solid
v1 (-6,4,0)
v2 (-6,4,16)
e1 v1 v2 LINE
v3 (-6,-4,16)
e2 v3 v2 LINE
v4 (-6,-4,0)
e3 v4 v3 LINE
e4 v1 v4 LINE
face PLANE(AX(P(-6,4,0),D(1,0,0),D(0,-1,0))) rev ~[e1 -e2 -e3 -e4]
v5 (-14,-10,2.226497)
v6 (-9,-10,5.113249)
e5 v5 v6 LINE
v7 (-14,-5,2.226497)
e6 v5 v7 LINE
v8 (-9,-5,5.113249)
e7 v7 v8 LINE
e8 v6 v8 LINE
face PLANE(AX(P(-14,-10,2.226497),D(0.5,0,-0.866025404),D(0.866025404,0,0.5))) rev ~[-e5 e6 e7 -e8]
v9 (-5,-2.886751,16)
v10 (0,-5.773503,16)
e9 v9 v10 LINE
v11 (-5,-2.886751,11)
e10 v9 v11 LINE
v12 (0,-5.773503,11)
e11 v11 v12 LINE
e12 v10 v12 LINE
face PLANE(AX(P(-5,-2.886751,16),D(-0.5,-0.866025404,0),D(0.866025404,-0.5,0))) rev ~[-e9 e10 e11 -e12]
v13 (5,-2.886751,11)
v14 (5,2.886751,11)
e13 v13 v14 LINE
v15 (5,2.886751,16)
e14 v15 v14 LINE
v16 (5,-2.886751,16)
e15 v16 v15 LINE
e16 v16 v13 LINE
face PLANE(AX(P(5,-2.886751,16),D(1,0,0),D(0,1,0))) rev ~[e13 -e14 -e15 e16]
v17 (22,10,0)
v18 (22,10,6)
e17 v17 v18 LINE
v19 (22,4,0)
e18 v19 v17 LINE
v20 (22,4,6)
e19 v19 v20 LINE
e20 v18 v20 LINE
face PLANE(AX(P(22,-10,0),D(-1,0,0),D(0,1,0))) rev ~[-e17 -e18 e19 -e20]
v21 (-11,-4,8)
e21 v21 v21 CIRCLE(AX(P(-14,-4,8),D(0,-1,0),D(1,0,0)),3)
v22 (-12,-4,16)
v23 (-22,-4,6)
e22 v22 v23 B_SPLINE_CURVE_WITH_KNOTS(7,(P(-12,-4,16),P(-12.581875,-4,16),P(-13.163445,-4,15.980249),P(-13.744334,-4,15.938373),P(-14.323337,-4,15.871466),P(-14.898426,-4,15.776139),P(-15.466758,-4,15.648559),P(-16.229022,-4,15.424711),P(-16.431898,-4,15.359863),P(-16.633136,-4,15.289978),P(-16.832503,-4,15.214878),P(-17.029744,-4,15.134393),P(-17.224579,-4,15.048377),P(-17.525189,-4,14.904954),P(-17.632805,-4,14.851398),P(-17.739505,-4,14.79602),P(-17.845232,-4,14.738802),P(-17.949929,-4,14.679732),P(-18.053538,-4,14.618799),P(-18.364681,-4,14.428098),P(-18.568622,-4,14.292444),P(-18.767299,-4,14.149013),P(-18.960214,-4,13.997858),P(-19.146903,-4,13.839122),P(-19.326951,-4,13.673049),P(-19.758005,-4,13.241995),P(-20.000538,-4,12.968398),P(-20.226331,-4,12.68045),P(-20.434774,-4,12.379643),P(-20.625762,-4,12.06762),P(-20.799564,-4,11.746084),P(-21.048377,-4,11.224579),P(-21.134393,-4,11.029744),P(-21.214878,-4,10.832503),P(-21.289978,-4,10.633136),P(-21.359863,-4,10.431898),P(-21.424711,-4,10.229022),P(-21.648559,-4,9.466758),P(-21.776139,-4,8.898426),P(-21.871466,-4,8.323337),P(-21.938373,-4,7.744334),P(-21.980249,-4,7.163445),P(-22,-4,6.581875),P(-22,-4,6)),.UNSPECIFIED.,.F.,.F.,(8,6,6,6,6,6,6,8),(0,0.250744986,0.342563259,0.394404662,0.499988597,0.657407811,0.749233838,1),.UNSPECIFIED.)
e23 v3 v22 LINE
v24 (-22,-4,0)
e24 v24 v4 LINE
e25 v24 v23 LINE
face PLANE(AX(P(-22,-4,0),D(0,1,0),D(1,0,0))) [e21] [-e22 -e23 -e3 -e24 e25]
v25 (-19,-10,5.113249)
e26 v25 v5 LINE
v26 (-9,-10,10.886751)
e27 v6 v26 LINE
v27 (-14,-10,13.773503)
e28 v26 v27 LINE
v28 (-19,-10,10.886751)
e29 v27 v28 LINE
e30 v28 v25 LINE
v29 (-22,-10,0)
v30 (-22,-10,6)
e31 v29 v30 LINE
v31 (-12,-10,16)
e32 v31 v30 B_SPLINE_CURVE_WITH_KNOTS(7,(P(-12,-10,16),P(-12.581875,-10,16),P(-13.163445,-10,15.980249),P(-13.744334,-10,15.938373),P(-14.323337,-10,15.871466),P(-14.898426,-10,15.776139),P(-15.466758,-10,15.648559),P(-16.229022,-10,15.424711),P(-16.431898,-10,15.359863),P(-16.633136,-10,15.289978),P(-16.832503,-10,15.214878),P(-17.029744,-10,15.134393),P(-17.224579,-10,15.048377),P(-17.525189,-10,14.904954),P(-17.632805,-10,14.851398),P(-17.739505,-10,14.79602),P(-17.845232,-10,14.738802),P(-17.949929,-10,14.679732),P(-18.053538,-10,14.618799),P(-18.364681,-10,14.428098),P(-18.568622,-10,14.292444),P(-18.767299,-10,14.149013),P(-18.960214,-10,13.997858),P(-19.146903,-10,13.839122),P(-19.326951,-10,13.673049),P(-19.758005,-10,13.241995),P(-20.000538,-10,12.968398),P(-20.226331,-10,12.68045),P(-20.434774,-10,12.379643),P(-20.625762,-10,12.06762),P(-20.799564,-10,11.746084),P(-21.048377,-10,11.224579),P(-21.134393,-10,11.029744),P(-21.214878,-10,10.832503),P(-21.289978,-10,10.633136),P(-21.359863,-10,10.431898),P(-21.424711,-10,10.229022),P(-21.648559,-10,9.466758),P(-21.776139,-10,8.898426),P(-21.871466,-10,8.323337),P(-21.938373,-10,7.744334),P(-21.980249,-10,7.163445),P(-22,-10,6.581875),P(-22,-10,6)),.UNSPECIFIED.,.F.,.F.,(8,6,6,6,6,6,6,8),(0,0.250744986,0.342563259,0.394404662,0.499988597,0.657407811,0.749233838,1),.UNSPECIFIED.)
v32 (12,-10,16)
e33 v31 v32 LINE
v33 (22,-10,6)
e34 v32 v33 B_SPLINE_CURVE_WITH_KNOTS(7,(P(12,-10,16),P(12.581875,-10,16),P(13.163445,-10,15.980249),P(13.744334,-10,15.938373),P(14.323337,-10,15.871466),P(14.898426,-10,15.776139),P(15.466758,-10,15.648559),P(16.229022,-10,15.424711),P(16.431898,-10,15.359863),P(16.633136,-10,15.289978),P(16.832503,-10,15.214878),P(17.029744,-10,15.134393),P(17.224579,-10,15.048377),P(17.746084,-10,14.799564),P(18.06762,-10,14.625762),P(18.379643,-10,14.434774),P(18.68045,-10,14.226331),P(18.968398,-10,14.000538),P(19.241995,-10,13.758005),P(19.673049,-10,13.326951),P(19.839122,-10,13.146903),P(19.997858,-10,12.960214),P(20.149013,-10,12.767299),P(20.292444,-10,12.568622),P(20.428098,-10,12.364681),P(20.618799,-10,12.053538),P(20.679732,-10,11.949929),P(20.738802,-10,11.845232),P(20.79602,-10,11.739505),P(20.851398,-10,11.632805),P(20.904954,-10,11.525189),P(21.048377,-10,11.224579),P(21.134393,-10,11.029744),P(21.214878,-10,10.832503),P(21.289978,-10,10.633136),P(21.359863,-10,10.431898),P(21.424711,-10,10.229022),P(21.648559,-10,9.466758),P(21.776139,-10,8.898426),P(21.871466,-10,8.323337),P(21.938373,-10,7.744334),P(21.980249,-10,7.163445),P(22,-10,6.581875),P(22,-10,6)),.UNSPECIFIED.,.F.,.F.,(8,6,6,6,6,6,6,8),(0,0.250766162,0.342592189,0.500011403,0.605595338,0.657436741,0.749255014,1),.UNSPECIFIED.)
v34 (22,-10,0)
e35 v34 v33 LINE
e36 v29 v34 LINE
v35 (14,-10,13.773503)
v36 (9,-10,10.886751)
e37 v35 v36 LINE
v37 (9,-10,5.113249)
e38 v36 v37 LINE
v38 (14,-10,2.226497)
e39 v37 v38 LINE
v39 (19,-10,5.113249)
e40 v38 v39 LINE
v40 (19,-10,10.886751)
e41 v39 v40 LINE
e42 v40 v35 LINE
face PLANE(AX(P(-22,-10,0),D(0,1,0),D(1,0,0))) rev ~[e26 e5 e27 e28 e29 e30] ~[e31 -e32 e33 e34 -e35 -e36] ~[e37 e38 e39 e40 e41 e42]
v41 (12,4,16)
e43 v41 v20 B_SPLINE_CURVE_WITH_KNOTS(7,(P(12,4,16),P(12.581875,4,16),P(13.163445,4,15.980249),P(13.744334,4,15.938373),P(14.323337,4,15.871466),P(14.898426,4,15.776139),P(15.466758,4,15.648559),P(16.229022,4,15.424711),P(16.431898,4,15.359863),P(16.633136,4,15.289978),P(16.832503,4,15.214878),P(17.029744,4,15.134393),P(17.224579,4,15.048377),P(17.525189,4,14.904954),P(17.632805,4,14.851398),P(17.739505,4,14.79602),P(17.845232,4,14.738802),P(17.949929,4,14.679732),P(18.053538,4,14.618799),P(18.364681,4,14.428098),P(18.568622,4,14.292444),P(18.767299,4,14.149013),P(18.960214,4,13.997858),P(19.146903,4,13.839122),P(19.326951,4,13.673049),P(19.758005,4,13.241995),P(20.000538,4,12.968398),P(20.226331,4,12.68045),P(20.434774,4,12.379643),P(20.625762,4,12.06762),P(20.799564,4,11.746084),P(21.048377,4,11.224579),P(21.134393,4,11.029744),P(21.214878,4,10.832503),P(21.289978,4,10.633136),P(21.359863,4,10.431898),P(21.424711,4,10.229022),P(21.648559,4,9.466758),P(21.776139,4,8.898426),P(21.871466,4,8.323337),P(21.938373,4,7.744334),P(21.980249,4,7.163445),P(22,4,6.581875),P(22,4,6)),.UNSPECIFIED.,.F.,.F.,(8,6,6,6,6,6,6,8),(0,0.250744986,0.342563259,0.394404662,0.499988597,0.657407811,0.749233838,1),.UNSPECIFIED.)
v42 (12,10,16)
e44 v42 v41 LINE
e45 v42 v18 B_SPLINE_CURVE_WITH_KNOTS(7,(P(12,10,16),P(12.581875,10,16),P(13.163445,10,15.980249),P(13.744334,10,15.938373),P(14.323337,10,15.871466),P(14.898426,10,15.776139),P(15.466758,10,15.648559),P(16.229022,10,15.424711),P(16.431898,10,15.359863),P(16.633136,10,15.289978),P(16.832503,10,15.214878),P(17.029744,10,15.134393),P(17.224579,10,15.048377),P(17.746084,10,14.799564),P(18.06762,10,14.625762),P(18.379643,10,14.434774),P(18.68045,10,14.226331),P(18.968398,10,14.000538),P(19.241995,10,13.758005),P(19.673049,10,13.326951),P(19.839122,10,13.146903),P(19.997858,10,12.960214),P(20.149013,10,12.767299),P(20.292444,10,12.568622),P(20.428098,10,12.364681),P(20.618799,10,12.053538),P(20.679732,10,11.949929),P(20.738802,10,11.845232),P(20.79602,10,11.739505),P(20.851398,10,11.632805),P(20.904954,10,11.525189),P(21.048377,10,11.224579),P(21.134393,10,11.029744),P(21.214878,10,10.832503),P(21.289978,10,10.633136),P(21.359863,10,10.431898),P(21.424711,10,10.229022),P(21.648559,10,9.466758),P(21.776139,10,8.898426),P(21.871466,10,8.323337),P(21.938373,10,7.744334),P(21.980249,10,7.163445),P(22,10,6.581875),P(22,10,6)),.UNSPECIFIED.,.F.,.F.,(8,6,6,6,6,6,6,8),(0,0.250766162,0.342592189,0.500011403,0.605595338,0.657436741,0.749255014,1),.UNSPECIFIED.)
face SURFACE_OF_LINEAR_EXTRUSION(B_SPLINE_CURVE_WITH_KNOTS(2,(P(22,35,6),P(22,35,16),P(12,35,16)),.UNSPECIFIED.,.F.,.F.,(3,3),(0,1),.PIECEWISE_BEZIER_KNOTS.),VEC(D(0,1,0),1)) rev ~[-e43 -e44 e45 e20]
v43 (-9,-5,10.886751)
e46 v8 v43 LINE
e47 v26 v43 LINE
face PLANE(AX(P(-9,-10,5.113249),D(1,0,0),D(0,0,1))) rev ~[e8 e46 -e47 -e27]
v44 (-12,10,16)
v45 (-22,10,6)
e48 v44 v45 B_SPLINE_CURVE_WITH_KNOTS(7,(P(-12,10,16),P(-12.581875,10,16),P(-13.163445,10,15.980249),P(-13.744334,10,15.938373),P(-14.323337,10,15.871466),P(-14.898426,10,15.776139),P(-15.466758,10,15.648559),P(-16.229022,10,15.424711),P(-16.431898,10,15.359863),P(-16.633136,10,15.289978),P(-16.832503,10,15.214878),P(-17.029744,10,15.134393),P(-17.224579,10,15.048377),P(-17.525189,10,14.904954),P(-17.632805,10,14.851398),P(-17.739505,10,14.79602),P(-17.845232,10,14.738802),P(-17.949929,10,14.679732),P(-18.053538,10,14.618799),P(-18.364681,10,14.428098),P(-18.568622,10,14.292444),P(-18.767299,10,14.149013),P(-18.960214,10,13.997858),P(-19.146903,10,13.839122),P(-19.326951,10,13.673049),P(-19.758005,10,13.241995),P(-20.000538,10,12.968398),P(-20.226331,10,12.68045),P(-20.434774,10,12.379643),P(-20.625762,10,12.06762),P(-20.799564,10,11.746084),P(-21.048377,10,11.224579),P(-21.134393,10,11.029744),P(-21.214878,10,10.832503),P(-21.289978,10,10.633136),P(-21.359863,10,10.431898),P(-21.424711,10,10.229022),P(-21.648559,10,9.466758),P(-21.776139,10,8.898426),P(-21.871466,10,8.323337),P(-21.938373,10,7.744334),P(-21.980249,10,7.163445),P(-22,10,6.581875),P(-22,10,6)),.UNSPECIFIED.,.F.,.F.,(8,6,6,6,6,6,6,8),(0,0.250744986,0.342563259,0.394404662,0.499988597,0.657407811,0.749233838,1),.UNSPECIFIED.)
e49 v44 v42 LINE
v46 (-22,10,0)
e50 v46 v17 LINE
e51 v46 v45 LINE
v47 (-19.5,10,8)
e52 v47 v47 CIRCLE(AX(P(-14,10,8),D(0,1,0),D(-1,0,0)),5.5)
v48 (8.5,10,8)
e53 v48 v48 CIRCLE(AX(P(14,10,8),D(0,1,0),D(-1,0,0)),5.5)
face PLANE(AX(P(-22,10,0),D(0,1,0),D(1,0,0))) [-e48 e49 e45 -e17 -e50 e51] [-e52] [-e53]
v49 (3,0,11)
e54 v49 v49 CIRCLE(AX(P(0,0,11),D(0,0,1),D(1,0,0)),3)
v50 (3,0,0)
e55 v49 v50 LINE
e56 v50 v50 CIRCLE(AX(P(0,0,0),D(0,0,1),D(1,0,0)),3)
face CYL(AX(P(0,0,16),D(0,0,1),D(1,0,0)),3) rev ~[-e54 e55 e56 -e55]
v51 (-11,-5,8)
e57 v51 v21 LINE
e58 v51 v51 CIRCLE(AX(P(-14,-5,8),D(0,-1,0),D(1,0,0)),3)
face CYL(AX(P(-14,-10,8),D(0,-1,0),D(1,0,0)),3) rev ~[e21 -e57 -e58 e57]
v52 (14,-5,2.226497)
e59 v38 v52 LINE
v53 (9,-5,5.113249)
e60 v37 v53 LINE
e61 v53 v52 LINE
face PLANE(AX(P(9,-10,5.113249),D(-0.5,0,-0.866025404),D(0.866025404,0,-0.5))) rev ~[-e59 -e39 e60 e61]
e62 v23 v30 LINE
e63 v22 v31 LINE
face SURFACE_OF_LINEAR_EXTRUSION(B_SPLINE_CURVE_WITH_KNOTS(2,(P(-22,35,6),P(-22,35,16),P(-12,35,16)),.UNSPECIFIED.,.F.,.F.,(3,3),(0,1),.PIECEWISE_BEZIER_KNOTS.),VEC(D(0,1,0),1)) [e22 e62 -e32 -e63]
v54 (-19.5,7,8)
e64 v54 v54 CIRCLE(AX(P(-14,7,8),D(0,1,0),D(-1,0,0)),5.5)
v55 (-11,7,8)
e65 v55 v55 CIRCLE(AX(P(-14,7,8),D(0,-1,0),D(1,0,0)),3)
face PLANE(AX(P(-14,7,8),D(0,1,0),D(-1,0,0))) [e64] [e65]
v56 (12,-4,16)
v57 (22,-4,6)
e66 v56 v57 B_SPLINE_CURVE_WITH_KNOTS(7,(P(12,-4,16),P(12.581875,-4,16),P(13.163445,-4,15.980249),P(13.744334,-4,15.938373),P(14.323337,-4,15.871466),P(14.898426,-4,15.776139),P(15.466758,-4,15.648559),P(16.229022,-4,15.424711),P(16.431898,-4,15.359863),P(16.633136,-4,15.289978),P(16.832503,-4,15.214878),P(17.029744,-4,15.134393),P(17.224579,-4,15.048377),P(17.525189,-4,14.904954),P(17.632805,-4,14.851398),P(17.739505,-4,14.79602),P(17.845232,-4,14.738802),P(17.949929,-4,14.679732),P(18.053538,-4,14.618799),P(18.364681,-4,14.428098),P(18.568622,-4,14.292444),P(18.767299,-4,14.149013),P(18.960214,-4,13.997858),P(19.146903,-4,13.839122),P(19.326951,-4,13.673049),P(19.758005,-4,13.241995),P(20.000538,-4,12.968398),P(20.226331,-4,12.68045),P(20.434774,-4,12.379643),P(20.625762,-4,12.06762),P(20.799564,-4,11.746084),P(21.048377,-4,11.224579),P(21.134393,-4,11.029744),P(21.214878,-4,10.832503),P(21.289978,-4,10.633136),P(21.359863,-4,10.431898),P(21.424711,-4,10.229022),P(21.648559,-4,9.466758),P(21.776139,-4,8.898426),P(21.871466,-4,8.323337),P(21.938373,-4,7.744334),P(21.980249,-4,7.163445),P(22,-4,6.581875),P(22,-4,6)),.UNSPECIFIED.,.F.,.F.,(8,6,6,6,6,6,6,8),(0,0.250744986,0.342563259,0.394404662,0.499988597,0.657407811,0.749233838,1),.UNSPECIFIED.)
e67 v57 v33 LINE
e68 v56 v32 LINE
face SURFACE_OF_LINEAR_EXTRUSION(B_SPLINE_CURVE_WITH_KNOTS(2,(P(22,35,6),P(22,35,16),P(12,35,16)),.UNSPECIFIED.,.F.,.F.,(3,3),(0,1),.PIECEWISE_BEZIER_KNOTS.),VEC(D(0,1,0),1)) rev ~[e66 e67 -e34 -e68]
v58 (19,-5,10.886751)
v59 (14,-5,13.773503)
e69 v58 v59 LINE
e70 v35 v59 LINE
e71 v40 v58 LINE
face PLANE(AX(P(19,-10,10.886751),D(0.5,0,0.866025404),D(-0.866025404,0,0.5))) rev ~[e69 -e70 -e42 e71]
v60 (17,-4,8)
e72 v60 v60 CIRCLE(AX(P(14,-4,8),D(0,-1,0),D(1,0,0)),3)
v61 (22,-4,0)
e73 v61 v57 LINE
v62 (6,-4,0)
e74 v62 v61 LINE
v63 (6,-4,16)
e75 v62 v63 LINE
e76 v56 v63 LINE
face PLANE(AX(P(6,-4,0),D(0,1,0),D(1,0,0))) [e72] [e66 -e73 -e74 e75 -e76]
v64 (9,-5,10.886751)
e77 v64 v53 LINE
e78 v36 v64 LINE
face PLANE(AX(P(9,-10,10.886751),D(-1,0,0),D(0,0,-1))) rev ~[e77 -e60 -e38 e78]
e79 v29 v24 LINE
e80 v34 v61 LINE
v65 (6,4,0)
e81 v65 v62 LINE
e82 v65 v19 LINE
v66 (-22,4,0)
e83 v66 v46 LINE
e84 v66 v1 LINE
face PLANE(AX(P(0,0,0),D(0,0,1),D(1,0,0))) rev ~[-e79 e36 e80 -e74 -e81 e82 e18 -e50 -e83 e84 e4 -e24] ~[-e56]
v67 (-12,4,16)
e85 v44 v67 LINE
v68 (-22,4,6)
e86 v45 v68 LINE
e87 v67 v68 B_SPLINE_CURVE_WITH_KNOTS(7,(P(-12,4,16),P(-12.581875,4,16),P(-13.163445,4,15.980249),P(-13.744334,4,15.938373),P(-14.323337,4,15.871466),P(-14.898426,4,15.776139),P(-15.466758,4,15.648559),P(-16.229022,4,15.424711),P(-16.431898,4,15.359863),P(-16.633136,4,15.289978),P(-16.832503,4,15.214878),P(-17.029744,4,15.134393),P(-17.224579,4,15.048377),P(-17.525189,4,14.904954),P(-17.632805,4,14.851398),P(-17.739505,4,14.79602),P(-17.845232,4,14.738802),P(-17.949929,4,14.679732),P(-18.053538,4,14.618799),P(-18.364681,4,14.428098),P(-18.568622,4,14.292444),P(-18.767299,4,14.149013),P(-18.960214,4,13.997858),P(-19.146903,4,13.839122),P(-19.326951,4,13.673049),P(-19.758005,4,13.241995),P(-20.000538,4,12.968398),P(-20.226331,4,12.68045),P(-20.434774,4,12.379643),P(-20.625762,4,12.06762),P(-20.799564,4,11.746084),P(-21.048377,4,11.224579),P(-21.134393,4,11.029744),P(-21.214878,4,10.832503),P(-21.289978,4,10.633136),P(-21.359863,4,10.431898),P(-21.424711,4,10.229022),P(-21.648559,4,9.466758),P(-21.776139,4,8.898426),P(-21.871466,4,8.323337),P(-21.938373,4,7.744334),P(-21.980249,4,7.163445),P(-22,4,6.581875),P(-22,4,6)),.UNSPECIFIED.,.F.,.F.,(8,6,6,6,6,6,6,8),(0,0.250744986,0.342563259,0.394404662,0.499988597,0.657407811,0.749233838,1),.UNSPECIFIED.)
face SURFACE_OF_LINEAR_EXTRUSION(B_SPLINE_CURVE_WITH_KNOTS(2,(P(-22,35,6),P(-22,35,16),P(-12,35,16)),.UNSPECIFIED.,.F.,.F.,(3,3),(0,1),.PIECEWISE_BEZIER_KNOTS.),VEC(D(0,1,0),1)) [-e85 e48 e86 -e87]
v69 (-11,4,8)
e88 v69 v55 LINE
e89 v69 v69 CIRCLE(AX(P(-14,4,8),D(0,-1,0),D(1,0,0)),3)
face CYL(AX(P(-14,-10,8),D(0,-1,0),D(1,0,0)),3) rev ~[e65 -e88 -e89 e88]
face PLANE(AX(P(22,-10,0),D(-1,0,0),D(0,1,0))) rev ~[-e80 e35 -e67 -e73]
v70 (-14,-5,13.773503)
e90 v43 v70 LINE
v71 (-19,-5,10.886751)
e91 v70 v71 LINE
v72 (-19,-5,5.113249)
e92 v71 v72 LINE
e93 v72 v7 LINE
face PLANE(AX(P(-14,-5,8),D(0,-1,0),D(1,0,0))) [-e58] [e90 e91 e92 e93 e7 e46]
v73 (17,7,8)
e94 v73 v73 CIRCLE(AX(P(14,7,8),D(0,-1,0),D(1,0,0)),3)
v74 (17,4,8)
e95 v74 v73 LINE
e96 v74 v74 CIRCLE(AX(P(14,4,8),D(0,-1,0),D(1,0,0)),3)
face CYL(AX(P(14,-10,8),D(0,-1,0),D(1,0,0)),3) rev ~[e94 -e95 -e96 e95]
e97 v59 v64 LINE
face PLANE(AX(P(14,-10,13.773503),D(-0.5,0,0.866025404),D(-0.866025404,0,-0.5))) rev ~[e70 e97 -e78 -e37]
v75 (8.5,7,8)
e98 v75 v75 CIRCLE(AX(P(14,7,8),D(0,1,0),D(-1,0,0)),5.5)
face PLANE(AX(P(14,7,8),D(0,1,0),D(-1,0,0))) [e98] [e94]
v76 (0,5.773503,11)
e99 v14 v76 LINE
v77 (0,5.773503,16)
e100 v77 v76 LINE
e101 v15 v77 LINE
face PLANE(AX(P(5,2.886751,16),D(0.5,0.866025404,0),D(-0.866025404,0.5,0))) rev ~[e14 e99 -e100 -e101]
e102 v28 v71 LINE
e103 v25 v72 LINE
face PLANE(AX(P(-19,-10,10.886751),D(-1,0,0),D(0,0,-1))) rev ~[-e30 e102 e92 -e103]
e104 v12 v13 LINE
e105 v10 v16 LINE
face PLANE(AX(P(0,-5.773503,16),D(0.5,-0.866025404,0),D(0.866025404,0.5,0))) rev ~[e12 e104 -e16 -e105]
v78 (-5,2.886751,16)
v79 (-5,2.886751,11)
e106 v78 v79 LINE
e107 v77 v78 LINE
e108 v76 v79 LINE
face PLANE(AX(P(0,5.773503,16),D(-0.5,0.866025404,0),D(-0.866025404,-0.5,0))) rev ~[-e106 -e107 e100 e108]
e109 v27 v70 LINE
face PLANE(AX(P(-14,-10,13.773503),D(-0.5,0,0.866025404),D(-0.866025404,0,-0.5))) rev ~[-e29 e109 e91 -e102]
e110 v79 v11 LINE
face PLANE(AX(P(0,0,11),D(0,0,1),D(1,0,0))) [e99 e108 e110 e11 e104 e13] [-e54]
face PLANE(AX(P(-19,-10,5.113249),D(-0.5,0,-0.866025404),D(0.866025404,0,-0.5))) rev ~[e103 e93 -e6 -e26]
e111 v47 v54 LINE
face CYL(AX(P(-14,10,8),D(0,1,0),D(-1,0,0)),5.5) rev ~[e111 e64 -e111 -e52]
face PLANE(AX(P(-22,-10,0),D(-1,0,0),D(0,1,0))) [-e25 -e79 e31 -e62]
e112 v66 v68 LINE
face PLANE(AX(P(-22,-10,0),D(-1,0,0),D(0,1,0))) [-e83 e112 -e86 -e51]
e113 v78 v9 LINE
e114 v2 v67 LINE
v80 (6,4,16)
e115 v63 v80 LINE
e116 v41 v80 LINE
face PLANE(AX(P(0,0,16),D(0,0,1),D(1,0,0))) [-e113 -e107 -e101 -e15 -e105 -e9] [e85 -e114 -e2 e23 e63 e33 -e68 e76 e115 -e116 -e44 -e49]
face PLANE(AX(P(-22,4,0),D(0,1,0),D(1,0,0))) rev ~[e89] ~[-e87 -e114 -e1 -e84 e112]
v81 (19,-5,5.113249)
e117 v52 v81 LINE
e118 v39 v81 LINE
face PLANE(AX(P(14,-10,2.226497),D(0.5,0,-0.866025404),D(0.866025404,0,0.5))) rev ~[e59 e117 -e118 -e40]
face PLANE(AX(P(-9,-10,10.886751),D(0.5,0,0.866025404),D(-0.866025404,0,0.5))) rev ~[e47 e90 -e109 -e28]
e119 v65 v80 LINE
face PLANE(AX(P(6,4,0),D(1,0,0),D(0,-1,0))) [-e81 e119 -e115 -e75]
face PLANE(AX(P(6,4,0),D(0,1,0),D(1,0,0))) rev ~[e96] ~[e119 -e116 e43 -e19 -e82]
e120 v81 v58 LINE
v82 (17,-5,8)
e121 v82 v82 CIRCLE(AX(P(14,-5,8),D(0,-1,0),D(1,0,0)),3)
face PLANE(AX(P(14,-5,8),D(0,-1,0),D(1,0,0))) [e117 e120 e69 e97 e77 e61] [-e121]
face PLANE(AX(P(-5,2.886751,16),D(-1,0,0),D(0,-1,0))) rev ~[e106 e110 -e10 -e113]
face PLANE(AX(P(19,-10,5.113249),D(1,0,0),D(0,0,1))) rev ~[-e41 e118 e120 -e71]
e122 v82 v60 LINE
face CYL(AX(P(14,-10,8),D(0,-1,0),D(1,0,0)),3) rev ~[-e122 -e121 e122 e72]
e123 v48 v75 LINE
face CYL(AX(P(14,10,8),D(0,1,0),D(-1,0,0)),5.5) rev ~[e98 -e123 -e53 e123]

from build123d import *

# Parameters (mm, degrees)
F0_W        = 44
F0_H        = 20
F1_DEPTH    = 16
F2_R        = 3
F3_DEPTH    = 16
F5_DEPTH    = 5
F6_T1_DEPTH = 70
F7_R        = 3
F8_DEPTH    = 20
F10_DEPTH   = 5
F11_R       = 5.5
F12_DEPTH   = 3
F13_W       = 16
F13_H       = 8
F14_DEPTH   = 25


# Not quite as in the source:
# - a fillet or chamfer that OpenCascade refuses, or shapes differently, is made with other operations: its cross-section is extruded or revolved along the edge and cut away or added


with BuildPart() as f1:
    # F0 (on Top) → F1 (new body)
    with BuildSketch(Plane.XY):
        Rectangle(F0_W, F0_H)
    extrude(amount=F1_DEPTH)

    # F2 (on face) → F3 (cut, through all)
    with BuildSketch(Plane.XY.offset(16)):
        Circle(F2_R)
    extrude(amount=-F3_DEPTH, mode=Mode.SUBTRACT)

    # F4 (on face) → F5 (cut)
    with BuildSketch(Plane.XY.offset(16)):
        Polygon((5, -2.8867513459), (5, 2.8867513459), (0, 5.7735026919), (-5, 2.8867513459), (-5, -2.8867513459), (0, -5.7735026919), align=None)
    extrude(amount=-F5_DEPTH, mode=Mode.SUBTRACT)

    # F6: fillet of radius 10 on 2 edges, made by hand

    # F6_s2 → F6_t1 (cut)
    with BuildSketch(Plane.XZ.offset(-35)):
        with BuildLine():
            add(Edge.make_bspline(
                [(22, 6), (22, 16), (12, 16)],
                knots=[0, 0, 0, 1, 1, 1], degree=2, weights=[1, 1, 1]))
            Line((12, 16), (22, 16))
            Line((22, 16), (22, 6))
        make_face()
        with BuildLine():
            add(Edge.make_bspline(
                [(-22, 6), (-22, 16), (-12, 16)],
                knots=[0, 0, 0, 1, 1, 1], degree=2, weights=[1, 1, 1]))
            Line((-12, 16), (-22, 16))
            Line((-22, 16), (-22, 6))
        make_face()
    extrude(amount=F6_T1_DEPTH, mode=Mode.SUBTRACT)

    # F7 (on face) → F8 (cut, through all)
    with BuildSketch(Plane.XZ.offset(10)):
        with Locations((14, 8)):
            Circle(F7_R)
        with Locations((-14, 8)):
            Circle(F7_R)
    extrude(amount=-F8_DEPTH, mode=Mode.SUBTRACT)

    # F9 (on face) → F10 (cut)
    with BuildSketch(Plane.XZ.offset(10)):
        Polygon((9, 10.8867513459), (9, 5.1132486541), (14, 2.2264973081), (19, 5.1132486541), (19, 10.8867513459), (14, 13.7735026919), align=None)
        Polygon((-9, 5.1132486541), (-9, 10.8867513459), (-14, 13.7735026919), (-19, 10.8867513459), (-19, 5.1132486541), (-14, 2.2264973081), align=None)
    extrude(amount=-F10_DEPTH, mode=Mode.SUBTRACT)

    # F11 (on face) → F12 (cut)
    with BuildSketch(Plane(origin=(0, 10, 0), x_dir=(-1, 0, 0), z_dir=(0, 1, 0))):
        with Locations((-14, 8)):
            Circle(F11_R)
        with Locations((14, 8)):
            Circle(F11_R)
    extrude(amount=-F12_DEPTH, mode=Mode.SUBTRACT)

    # F13 (on face) → F14 (cut)
    with BuildSketch(Plane(origin=(0, 0, 0), x_dir=(1, 0, 0), z_dir=(0, 0, -1))):
        with Locations((-14, 0)):
            Rectangle(F13_W, F13_H)
        with Locations((14, 0)):
            Rectangle(F13_W, F13_H)
    extrude(amount=-F14_DEPTH, mode=Mode.SUBTRACT)


solid = f1.part
